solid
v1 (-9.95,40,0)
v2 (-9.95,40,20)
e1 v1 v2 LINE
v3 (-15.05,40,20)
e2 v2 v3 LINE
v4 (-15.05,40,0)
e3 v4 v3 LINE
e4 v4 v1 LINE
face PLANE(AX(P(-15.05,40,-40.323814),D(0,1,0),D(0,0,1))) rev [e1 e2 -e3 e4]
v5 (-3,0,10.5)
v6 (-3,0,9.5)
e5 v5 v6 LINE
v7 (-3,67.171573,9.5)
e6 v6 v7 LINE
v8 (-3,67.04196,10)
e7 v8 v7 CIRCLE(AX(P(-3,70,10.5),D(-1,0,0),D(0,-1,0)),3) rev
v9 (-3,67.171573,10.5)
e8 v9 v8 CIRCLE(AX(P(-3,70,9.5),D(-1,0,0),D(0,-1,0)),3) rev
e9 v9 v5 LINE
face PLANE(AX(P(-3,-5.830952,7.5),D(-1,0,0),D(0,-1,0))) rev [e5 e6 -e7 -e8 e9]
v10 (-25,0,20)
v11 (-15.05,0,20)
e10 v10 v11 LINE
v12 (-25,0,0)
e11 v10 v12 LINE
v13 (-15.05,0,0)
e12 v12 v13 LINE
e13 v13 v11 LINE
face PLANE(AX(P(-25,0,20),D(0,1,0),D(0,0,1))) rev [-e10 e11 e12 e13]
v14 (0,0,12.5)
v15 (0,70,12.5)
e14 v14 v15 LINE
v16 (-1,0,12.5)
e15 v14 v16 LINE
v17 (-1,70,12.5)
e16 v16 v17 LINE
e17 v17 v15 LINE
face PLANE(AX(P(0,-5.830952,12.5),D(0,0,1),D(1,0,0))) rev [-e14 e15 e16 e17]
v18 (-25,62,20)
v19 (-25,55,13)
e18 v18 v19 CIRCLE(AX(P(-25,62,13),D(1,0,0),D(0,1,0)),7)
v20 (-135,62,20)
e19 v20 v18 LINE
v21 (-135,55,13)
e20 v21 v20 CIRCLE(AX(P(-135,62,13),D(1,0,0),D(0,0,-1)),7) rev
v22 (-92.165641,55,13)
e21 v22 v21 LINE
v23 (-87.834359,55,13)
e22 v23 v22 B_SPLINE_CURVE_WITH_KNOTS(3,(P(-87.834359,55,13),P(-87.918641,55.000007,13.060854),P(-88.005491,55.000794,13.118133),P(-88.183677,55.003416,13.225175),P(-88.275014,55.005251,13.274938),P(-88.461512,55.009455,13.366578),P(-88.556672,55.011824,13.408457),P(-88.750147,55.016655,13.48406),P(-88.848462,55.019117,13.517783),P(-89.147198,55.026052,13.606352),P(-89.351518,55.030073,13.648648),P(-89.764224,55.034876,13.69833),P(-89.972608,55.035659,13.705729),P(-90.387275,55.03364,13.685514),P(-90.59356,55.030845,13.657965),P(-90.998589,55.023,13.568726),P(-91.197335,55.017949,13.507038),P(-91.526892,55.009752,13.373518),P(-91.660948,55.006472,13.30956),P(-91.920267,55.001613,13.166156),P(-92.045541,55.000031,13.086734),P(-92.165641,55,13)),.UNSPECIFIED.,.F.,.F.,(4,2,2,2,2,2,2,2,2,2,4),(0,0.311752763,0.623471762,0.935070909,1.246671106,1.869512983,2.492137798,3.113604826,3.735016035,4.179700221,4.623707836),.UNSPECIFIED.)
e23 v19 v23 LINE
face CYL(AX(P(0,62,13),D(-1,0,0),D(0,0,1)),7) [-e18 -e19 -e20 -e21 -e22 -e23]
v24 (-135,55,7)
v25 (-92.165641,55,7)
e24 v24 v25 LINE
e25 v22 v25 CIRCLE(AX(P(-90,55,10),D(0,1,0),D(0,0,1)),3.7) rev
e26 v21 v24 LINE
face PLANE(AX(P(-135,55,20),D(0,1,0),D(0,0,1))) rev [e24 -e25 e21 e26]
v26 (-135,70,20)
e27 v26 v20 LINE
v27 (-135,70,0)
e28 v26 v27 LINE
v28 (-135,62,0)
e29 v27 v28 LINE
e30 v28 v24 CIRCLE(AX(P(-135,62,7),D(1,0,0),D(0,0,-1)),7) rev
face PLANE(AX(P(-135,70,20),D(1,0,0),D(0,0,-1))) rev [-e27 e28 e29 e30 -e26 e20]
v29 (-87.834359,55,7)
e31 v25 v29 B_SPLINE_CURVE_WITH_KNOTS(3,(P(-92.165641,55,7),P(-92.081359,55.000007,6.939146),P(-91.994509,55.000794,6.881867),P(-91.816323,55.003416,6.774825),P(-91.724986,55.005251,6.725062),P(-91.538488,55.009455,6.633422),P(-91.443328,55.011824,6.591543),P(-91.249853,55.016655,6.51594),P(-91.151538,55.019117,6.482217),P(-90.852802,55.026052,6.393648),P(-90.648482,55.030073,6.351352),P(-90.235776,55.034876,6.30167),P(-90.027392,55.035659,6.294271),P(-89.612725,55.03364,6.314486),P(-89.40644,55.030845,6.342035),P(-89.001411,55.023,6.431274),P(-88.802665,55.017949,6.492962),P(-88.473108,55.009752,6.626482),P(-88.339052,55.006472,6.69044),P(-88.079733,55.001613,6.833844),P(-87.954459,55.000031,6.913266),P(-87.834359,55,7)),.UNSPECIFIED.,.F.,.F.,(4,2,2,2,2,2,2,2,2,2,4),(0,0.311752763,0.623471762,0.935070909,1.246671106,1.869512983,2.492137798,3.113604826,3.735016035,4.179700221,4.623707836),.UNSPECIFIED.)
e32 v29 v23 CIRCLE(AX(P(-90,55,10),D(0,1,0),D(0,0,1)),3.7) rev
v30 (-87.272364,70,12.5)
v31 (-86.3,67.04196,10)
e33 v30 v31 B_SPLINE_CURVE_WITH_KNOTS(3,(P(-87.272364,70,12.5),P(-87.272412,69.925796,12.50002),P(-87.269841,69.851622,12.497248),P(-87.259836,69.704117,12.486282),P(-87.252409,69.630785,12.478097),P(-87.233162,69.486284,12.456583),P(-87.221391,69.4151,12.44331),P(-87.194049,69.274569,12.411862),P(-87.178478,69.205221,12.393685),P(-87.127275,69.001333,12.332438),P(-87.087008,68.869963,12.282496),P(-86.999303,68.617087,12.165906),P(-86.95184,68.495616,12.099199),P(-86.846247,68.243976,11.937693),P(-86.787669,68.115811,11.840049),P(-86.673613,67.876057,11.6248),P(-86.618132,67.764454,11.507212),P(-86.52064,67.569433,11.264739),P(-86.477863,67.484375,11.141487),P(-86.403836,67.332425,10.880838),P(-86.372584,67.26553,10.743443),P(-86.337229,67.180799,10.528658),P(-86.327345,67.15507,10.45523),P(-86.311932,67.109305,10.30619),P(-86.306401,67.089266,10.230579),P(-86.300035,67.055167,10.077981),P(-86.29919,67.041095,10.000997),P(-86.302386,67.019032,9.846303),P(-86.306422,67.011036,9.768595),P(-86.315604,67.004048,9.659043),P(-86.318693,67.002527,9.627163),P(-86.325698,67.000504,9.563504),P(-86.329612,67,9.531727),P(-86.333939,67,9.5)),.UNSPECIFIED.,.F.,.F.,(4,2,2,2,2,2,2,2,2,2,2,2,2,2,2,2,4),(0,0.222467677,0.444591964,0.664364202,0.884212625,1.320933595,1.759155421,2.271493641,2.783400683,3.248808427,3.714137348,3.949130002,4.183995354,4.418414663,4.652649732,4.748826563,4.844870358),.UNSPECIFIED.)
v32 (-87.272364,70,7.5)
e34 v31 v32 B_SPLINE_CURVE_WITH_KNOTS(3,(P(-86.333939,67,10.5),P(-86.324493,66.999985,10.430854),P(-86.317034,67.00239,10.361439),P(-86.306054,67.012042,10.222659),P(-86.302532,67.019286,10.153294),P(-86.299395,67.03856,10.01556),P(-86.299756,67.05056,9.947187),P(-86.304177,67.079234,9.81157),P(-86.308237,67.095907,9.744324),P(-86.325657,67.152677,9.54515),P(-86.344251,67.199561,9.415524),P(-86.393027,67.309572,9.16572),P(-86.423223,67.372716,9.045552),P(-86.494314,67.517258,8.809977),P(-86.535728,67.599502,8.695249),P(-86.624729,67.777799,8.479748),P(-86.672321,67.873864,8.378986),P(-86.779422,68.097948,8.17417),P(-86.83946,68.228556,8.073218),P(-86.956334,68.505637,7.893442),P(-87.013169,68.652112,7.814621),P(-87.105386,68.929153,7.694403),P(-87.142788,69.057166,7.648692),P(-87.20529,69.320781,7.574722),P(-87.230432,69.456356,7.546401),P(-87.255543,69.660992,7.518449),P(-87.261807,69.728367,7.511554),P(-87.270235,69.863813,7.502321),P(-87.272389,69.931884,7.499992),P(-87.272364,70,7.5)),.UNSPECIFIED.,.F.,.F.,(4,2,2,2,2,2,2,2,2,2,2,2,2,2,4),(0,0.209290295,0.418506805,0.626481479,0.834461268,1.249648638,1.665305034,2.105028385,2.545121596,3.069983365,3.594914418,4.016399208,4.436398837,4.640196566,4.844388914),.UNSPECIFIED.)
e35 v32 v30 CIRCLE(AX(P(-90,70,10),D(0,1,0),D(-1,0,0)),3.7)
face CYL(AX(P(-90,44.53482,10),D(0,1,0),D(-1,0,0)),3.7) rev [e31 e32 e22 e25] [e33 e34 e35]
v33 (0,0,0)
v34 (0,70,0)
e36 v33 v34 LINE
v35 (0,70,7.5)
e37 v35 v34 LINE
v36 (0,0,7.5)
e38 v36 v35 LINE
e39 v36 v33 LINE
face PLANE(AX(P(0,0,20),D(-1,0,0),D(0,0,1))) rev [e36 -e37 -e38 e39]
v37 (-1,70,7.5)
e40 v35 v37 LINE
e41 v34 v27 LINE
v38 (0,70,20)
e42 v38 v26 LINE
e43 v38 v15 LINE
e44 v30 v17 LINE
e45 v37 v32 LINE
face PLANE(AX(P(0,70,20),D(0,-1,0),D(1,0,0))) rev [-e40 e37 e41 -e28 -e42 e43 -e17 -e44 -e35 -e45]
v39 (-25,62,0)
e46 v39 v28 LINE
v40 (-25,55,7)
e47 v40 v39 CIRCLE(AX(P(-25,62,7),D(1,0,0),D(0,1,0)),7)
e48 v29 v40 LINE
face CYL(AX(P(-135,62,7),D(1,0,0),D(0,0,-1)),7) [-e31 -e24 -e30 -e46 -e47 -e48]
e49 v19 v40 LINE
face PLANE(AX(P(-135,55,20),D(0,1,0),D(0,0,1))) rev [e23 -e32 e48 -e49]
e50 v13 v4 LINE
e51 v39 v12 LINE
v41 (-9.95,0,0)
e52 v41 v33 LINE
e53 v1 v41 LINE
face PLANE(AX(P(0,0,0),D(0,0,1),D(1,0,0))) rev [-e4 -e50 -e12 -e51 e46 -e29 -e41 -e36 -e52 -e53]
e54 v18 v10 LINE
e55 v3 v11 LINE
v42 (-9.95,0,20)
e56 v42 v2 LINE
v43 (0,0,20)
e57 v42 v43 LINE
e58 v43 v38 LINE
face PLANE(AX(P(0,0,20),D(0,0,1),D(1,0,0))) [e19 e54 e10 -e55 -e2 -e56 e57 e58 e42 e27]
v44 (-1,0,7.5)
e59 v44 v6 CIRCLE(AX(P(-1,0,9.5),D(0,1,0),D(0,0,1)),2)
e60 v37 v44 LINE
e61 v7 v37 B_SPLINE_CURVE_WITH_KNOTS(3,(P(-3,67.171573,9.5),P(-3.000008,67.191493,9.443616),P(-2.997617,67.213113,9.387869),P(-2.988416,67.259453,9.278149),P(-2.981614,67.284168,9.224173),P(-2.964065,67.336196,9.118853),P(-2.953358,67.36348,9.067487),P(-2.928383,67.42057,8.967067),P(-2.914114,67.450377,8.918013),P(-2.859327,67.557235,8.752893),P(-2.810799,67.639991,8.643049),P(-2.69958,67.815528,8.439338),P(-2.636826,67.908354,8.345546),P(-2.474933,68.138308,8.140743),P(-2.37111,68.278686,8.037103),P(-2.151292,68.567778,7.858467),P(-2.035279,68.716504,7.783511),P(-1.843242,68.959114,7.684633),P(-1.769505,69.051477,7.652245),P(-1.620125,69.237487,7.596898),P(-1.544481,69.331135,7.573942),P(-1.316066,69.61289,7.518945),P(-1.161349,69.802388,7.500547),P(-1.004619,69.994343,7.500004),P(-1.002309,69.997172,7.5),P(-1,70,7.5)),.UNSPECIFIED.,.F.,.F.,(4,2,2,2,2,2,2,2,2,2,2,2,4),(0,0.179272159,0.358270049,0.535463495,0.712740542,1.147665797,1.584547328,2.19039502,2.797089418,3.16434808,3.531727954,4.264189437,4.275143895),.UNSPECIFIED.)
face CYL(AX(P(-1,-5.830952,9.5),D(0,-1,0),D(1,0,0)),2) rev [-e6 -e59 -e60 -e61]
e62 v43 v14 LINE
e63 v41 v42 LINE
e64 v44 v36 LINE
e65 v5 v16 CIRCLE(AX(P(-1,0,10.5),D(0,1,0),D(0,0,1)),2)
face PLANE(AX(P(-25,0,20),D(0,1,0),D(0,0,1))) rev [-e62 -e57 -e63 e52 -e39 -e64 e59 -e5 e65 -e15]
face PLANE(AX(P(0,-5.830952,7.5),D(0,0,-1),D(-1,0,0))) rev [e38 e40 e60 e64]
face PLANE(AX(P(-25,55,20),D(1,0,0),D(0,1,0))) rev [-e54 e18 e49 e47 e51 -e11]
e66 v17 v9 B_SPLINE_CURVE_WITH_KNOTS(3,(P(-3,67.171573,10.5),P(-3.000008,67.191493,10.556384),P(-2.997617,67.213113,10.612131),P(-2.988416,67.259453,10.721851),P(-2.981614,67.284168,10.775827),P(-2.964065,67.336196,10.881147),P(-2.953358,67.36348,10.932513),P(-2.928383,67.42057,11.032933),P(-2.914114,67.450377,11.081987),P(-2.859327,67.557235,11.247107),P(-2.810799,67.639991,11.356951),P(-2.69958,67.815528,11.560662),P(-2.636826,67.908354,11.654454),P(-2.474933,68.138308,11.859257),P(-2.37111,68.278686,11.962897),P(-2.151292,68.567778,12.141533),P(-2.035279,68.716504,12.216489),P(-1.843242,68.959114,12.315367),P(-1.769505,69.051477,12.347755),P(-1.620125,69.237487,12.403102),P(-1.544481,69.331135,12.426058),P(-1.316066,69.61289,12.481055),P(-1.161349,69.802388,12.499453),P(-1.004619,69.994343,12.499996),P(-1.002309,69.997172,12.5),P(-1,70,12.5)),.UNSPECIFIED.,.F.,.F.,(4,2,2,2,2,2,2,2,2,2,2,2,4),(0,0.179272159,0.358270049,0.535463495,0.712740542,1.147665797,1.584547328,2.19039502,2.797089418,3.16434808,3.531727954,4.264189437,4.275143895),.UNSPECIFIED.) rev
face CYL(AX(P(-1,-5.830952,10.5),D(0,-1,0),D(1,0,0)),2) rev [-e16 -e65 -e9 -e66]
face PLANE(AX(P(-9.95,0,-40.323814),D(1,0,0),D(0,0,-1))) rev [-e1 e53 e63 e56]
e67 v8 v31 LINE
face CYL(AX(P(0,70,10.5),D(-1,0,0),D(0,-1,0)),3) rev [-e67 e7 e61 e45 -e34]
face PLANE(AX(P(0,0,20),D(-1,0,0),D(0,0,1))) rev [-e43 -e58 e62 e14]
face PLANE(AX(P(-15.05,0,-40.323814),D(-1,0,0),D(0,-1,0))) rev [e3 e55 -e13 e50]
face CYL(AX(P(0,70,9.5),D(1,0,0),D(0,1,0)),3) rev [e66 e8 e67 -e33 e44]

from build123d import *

# Parameters (mm, degrees)
BOSS_EXTRUDE1_DEPTH = 20
SKETCH2_W           = 5.1
SKETCH2_H           = 40
CUT_EXTRUDE1_DEPTH  = 20
FILLET1_R           = 7
CUT_EXTRUDE3_REACH  = 155.379
SKETCH5_R           = 3.7
SKETCH6_W           = 87.272363661
SKETCH6_H           = 5
CUT_EXTRUDE4_DEPTH  = 3
FILLET2_R           = 3
SKETCH7_W           = 3
SKETCH7_H           = 5
CUT_EXTRUDE5_DEPTH  = 70
FILLET3_R           = 2


with BuildPart() as part:
    # Sketch1 → Boss-Extrude1 (new body)
    with BuildSketch(Plane.XY):
        Polygon((0, 0), (0, 70), (-135, 70), (-135, 55), (-25, 55), (-25, 0), align=None)
    extrude(amount=BOSS_EXTRUDE1_DEPTH)

    # Sketch2 → Cut-Extrude1 (cut)
    with BuildSketch(Plane.XY.offset(20)):
        with Locations((-12.5, 20)):
            Rectangle(SKETCH2_W, SKETCH2_H)
    extrude(amount=-CUT_EXTRUDE1_DEPTH, mode=Mode.SUBTRACT)

    # Fillet1
    fillet1_edges = [part.edges().sort_by_distance(p)[0] for p in [
        (-80, 55, 20),
        (-80, 55, 0),
    ]]
    fillet(fillet1_edges, radius=FILLET1_R)

    # Cut-Extrude3: up to this face of the body (flat: up to its plane)
    cut_extrude3_end = Plane(part.part.faces().sort_by_distance((-80, 55, 10))[0])
    # Sketch5 → Cut-Extrude3 (cut, up to the picked face)
    with BuildSketch(Plane(origin=(0, 70, 0), x_dir=(1, 0, 0), z_dir=(0, 1, 0)), mode=Mode.PRIVATE) as cut_extrude3_sk1:
        with Locations(Location((-90, -10, 0), (0, 0, 180))):
            Circle(SKETCH5_R)
    cut_extrude3_tool1 = split(extrude(cut_extrude3_sk1.sketch, amount=-CUT_EXTRUDE3_REACH, mode=Mode.PRIVATE), bisect_by=cut_extrude3_end, keep=Keep.BOTH, mode=Mode.PRIVATE)
    add(cut_extrude3_tool1.solids().sort_by(Axis((-90, 70, 10), (0, -1, 0)))[0], mode=Mode.SUBTRACT)

    # Sketch6 → Cut-Extrude4 (cut)
    with BuildSketch(Plane(origin=(0, 70, 0), x_dir=(1, 0, 0), z_dir=(0, 1, 0))):
        with Locations((-43.63618183, -10)):
            Rectangle(SKETCH6_W, SKETCH6_H)
    extrude(amount=-CUT_EXTRUDE4_DEPTH, mode=Mode.SUBTRACT)

    # Fillet2
    # the kernel refuses this fillet: 3 mm, written as the material it adds along each edge
    with BuildSketch(Plane(origin=(0, 67, 12.5), x_dir=(0, 0, -1), z_dir=(-1, 0, 0))) as fillet2_piece_1_section:
        with BuildLine():
            CenterArc((FILLET2_R, -FILLET2_R), FILLET2_R, 90, 90)
            Line((0, -FILLET2_R), (0, 0))
            Line((0, 0), (FILLET2_R, 0))
        make_face()
    fillet2_piece_1 = extrude(amount=94.772363661, mode=Mode.PRIVATE)
    fillet2_piece_1 = fillet2_piece_1 - Plane(origin=(-90, 67.680644159, 10), x_dir=(-1, 0, 0), z_dir=(0, 1, 0)) * Cylinder(3.7, 202, mode=Mode.PRIVATE)
    add(fillet2_piece_1)
    with BuildSketch(Plane(origin=(-94.772363661, 67, 7.5), x_dir=(0, 1, 0), z_dir=(1, 0, 0))) as fillet2_piece_2_section:
        with BuildLine():
            CenterArc((FILLET2_R, FILLET2_R), FILLET2_R, 180, 90)
            Line((0, FILLET2_R), (0, 0))
            Line((0, 0), (FILLET2_R, 0))
        make_face()
    fillet2_piece_2 = extrude(amount=94.772363661, mode=Mode.PRIVATE)
    fillet2_piece_2 = fillet2_piece_2 - Plane(origin=(-90, 67.756833616, 10), x_dir=(-1, 0, 0), z_dir=(0, 1, 0)) * Cylinder(3.7, 202, mode=Mode.PRIVATE)
    add(fillet2_piece_2)

    # Sketch7 → Cut-Extrude5 (cut)
    with BuildSketch(Plane(origin=(0, 70, 0), x_dir=(1, 0, 0), z_dir=(0, 1, 0))):
        with Locations((-1.5, -10)):
            Rectangle(SKETCH7_W, SKETCH7_H)
    extrude(amount=-CUT_EXTRUDE5_DEPTH, mode=Mode.SUBTRACT)

    # Fillet3
    # the kernel refuses this fillet: 2 mm, written as the material it adds along each edge
    with BuildSketch(Plane(origin=(-3, 70, 12.5), x_dir=(0, 0, -1), z_dir=(0, -1, 0))) as fillet3_piece_1_section:
        with BuildLine():
            CenterArc((FILLET3_R, FILLET3_R), FILLET3_R, 180, 90)
            Line((0, FILLET3_R), (0, 0))
            Line((0, 0), (FILLET3_R, 0))
        make_face()
    fillet3_piece_1 = extrude(amount=70, mode=Mode.PRIVATE)
    fillet3_piece_1 = fillet3_piece_1 - Plane(origin=(-2.544196541, 70, 9.5), x_dir=(0, 0, -1), z_dir=(1, 0, 0)) * Cylinder(3, 148, mode=Mode.PRIVATE)
    add(fillet3_piece_1)
    with BuildSketch(Plane(origin=(-3, 70, 7.5), x_dir=(0, 0, 1), z_dir=(0, -1, 0))) as fillet3_piece_2_section:
        with BuildLine():
            CenterArc((FILLET3_R, -FILLET3_R), FILLET3_R, 90, 90)
            Line((0, -FILLET3_R), (0, 0))
            Line((0, 0), (FILLET3_R, 0))
        make_face()
    fillet3_piece_2 = extrude(amount=70, mode=Mode.PRIVATE)
    fillet3_piece_2 = fillet3_piece_2 - Plane(origin=(-2.544196926, 70, 10.5), x_dir=(0, 1, 0), z_dir=(-1, 0, 0)) * Cylinder(3, 148, mode=Mode.PRIVATE)
    add(fillet3_piece_2)


solid = part.part
